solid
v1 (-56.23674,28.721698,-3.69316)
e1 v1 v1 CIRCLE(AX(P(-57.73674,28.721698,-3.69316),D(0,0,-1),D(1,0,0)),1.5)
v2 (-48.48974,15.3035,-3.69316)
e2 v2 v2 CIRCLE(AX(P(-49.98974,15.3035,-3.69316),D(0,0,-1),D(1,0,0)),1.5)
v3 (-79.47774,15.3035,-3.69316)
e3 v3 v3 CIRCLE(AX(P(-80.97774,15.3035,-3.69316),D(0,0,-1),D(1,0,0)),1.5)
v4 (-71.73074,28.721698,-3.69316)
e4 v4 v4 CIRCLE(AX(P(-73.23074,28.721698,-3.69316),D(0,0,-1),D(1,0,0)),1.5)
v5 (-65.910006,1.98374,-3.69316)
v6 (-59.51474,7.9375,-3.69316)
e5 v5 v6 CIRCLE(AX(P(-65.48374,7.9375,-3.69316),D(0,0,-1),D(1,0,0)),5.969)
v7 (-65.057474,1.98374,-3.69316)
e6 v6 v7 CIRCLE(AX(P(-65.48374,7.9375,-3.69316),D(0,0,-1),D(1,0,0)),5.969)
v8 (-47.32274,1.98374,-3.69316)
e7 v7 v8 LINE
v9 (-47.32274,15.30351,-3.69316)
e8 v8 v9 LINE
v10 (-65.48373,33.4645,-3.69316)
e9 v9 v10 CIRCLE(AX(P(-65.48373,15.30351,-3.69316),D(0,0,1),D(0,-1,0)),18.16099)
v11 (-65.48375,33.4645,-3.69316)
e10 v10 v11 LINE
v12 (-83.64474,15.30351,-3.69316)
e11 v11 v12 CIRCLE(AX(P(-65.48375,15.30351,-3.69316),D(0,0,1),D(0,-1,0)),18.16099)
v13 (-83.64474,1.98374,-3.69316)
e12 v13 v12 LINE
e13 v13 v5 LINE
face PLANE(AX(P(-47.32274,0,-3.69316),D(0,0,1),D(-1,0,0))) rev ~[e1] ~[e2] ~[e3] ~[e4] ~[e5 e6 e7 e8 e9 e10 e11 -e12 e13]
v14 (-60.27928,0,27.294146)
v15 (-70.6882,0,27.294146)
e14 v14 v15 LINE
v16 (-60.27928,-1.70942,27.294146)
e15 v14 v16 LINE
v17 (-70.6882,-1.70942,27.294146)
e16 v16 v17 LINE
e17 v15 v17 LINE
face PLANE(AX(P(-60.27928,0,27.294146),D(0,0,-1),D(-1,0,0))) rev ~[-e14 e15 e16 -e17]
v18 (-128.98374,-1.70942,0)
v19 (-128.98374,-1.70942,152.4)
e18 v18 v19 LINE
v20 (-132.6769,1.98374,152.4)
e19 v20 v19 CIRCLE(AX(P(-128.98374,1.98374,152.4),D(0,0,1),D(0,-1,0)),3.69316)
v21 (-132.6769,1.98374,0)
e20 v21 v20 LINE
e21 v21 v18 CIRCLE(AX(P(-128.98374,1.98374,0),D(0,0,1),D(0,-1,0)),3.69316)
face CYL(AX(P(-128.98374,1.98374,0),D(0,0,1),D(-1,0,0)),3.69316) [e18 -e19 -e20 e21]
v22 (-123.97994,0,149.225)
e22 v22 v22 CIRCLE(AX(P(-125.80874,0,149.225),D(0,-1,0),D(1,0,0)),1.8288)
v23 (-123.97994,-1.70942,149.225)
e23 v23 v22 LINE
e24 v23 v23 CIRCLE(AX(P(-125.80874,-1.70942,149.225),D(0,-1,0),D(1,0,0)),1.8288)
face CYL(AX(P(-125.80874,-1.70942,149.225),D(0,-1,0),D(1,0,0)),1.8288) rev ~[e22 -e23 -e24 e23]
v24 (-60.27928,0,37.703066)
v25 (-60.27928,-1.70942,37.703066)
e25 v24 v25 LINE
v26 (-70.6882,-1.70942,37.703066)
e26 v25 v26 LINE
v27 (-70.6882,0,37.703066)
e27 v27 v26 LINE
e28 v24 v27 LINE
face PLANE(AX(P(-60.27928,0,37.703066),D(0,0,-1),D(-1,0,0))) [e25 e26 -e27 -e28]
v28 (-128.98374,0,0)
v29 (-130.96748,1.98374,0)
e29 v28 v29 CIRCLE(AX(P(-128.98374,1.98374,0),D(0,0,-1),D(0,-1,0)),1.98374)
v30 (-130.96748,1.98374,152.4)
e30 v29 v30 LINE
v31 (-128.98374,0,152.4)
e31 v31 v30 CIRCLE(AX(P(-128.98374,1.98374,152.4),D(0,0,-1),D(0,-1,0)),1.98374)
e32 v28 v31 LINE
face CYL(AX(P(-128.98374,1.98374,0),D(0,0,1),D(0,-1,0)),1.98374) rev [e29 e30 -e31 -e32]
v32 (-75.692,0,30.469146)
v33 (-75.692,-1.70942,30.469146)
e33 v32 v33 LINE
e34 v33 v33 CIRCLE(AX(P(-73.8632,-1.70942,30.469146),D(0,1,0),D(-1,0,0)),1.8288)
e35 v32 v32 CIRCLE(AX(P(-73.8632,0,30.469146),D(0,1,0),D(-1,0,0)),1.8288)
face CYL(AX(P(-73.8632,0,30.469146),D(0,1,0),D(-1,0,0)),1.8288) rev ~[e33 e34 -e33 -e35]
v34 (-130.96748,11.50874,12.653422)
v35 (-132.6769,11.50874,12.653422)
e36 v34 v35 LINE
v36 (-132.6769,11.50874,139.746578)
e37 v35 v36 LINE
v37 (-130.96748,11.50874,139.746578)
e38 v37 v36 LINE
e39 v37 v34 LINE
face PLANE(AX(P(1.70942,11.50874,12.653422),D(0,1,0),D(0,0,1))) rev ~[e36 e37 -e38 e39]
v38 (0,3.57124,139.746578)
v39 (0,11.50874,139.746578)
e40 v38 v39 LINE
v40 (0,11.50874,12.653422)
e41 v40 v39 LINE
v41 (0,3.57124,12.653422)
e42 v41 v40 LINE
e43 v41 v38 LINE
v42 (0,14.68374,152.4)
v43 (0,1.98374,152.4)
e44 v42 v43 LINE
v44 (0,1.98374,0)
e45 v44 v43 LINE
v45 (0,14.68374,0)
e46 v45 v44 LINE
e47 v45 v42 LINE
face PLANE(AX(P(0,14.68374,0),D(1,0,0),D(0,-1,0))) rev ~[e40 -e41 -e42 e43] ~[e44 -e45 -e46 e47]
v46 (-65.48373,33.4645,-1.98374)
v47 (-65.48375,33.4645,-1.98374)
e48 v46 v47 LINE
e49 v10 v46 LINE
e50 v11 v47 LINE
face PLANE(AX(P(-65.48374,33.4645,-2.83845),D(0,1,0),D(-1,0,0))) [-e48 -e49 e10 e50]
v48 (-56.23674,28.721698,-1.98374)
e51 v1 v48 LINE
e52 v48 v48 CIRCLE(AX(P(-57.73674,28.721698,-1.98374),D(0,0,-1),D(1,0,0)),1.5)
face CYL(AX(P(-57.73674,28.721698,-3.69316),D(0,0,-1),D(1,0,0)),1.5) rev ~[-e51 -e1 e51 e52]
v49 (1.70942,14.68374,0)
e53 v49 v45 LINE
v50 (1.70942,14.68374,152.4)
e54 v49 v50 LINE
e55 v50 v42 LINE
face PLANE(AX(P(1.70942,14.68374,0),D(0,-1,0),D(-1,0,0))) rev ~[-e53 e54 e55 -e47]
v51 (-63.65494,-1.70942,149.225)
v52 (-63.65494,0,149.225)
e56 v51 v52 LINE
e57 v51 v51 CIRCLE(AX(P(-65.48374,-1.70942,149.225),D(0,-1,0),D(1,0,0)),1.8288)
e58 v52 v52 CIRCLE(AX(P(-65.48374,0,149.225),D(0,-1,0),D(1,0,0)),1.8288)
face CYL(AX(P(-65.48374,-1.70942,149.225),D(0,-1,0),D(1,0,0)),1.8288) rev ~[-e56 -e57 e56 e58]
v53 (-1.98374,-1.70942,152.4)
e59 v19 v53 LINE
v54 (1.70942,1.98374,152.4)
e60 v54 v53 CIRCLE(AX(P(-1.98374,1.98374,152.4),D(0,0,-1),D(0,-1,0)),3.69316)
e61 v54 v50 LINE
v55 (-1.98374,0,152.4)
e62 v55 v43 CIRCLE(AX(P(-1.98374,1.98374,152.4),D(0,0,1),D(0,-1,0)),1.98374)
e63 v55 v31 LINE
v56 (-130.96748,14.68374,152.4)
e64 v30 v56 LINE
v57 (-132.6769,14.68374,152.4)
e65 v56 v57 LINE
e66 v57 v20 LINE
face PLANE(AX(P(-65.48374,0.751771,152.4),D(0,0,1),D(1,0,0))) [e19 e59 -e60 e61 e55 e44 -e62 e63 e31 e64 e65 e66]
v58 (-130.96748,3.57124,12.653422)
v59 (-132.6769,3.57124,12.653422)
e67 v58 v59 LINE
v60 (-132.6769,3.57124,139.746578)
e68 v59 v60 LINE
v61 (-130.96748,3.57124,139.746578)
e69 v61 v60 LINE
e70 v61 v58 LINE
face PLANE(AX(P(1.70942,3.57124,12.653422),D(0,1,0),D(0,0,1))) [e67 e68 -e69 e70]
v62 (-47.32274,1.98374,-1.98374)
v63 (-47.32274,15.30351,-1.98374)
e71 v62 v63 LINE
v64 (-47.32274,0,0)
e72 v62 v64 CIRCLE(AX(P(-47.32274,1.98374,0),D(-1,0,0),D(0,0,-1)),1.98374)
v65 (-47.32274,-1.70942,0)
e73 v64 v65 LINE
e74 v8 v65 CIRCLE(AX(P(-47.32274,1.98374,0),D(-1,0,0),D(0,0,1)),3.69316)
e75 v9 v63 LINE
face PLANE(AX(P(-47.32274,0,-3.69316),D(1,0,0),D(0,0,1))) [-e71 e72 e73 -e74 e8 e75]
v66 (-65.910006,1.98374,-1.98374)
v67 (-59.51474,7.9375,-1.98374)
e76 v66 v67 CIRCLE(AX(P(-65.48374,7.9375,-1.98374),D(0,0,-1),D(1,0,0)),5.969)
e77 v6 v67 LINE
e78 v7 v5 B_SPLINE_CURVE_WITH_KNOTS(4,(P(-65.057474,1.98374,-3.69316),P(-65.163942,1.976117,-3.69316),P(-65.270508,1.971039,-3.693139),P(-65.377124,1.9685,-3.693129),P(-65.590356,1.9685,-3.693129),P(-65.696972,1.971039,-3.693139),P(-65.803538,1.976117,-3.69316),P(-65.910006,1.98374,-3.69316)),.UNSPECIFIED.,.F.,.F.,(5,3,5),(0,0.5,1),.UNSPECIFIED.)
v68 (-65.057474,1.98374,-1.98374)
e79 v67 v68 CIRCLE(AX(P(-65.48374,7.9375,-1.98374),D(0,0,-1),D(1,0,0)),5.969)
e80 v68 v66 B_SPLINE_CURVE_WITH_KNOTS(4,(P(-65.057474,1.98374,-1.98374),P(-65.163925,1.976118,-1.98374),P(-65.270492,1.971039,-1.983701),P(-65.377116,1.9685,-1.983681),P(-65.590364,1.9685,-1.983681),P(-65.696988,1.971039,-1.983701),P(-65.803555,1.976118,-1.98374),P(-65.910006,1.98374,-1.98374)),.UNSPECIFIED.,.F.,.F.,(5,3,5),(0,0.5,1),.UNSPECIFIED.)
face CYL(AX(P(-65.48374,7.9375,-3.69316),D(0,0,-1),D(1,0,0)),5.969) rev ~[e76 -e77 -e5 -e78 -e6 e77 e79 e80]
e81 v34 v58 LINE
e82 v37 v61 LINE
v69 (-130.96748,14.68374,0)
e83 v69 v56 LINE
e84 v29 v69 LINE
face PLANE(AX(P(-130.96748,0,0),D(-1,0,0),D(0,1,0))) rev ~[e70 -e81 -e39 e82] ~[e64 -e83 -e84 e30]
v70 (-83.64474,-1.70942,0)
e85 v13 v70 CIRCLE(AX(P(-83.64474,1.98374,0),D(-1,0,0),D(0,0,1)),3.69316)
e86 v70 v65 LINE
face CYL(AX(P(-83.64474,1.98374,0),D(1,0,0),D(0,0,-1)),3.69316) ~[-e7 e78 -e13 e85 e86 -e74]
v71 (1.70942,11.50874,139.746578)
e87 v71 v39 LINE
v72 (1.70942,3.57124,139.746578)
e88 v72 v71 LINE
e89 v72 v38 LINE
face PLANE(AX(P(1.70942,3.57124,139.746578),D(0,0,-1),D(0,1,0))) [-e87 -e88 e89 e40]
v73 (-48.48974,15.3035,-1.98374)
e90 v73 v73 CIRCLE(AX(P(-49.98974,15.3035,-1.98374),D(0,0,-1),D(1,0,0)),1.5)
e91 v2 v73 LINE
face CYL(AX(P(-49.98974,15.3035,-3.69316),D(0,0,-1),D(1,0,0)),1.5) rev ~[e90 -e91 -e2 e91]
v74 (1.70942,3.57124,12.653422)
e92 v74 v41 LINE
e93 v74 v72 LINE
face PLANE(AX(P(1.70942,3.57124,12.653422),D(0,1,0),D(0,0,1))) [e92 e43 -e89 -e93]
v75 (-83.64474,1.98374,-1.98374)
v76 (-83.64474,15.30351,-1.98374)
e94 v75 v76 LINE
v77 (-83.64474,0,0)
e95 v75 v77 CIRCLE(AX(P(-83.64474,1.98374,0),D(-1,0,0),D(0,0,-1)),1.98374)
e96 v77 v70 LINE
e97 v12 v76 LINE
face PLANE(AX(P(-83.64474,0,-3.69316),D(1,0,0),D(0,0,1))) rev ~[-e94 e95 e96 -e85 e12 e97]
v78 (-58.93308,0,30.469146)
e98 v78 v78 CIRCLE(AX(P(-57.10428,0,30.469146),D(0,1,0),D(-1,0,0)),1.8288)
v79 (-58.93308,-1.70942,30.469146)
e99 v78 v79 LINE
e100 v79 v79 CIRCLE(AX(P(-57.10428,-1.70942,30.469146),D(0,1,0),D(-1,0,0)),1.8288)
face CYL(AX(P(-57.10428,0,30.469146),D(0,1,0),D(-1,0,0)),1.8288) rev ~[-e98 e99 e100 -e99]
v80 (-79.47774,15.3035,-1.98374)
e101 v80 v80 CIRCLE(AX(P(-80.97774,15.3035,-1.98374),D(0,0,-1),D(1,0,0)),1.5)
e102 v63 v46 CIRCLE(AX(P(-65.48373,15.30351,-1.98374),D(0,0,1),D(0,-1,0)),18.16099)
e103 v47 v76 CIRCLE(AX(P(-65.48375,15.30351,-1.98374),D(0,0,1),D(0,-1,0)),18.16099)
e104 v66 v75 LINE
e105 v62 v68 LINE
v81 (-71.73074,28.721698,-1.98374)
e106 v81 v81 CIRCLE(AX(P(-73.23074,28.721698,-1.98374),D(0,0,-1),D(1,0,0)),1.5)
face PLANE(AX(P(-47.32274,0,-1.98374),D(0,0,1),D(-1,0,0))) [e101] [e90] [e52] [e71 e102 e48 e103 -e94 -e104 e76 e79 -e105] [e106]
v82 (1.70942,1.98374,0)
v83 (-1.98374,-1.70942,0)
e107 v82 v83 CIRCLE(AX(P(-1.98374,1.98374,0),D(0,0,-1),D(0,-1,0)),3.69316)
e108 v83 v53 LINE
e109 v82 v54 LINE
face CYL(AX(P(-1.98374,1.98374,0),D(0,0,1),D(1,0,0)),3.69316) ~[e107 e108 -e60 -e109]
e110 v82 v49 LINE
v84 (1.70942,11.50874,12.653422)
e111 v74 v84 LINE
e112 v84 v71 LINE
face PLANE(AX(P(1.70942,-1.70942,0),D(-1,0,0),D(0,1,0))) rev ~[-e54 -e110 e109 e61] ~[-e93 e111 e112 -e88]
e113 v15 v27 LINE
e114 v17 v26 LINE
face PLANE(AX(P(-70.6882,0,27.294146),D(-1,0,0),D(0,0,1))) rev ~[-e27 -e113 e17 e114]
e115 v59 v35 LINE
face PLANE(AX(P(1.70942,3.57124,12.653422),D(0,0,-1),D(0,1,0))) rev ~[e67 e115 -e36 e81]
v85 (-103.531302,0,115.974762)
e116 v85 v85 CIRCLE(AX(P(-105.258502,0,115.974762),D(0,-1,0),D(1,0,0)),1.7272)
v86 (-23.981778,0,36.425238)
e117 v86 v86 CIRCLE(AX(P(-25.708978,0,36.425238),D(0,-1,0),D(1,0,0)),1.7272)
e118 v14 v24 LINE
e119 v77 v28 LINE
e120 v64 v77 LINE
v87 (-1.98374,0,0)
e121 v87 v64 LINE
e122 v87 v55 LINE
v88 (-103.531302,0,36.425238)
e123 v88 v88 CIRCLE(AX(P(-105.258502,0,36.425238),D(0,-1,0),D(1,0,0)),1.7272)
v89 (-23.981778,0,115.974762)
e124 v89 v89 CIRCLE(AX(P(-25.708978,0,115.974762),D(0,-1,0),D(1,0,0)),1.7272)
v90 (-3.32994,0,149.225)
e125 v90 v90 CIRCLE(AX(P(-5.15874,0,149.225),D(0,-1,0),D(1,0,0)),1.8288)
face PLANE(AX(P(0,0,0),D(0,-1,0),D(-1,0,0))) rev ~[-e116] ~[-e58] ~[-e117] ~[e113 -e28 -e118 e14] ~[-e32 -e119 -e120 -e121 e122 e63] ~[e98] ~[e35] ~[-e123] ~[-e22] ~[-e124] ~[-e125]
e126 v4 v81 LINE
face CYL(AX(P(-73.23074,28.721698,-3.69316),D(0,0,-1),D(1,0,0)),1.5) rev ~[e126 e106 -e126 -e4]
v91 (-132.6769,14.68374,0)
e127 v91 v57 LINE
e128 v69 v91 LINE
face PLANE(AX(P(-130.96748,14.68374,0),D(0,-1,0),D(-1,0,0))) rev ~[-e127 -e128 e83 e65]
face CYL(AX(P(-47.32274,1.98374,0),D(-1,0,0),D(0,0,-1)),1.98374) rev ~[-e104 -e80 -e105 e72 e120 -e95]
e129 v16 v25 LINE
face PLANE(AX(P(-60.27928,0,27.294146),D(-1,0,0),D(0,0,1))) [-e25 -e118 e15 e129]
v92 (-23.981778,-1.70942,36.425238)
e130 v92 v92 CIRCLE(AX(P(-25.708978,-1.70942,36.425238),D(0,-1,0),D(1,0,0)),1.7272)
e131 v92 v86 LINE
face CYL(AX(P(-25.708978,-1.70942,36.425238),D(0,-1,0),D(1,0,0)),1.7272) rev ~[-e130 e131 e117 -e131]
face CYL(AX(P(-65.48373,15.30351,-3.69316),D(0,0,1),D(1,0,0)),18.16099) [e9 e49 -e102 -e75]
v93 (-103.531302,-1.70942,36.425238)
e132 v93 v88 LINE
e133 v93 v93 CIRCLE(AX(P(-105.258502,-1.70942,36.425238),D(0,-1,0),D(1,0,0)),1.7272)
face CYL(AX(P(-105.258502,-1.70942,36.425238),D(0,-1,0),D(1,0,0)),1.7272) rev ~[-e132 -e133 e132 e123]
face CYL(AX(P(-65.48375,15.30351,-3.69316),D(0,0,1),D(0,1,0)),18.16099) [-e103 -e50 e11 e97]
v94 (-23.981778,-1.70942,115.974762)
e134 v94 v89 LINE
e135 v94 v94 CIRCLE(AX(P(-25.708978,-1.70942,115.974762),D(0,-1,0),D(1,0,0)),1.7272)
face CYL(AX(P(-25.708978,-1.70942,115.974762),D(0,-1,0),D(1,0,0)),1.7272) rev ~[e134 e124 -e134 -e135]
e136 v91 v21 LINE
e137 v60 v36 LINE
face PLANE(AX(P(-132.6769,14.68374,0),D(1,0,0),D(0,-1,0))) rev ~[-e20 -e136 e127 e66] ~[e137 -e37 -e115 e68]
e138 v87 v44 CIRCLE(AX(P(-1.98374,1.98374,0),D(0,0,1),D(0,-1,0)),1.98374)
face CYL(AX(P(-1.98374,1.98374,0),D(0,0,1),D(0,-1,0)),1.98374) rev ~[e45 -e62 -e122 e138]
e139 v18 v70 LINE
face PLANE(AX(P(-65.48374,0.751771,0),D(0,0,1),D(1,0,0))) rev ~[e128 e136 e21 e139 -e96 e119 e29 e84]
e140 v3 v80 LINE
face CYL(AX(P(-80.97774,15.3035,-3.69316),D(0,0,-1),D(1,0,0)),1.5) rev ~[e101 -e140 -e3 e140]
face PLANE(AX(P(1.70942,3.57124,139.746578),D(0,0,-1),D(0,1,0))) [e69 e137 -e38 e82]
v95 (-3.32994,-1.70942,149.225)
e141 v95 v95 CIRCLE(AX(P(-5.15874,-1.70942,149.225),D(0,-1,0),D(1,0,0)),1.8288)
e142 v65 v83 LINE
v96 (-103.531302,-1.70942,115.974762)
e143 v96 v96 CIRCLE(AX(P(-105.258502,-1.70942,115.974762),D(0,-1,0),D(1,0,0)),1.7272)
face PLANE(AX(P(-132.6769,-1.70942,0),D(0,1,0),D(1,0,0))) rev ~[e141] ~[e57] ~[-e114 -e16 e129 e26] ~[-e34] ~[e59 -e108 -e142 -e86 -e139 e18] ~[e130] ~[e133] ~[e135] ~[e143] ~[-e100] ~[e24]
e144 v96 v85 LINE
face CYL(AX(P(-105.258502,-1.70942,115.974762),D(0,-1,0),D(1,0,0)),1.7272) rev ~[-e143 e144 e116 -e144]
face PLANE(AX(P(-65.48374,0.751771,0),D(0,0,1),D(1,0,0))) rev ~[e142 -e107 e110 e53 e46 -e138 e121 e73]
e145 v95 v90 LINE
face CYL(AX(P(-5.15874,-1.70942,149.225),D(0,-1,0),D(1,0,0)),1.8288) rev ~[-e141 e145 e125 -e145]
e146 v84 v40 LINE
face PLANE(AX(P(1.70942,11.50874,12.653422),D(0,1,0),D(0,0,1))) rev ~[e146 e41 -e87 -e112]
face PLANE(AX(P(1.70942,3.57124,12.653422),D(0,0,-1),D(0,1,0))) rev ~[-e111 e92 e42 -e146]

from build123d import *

# Parameters (mm, degrees)
F1_DEPTH  = 152.4
F2_W      = 7.9375
F2_H      = 127.0931567346
F3_DEPTH  = 134.38632
F4_W      = 36.322
F4_H      = 1.70942
F5_DEPTH  = 3.69316
F6_W      = 36.322
F6_H      = 1.70942
F7_DEPTH  = 33.4645
F8_R      = 3.69316
F9_R      = 1.98374
F10_R     = 5.969
F10_R_2   = 1.5
F11_DEPTH = 3.69316
F12_R     = 18.16099
F13_R     = 1.8288
F14_DEPTH = 1.70942
F15_R     = 1.7272
F16_DEPTH = 1.70942
F17_W     = 10.40892
F17_H     = 10.40892
F17_R     = 1.8288
F18_DEPTH = 1.70942


# Not quite as in the source:
# - a fillet or chamfer is up to 0.001 mm smaller than in the source, because OpenCascade refuses the exact size


with BuildPart() as f1:
    # F0 (on Top) → F1 (new body)
    with BuildSketch(Plane.XY):
        Polygon((0, 14.68374), (0, 0), (-130.96748, 0), (-130.96748, 14.68374), (-132.6769, 14.68374), (-132.6769, -1.70942), (1.70942, -1.70942), (1.70942, 14.68374), align=None)
    extrude(amount=F1_DEPTH)

    # F2 (on face) → F3 (cut, through all)
    with BuildSketch(Plane.YZ.offset(1.70942)):
        with Locations((7.53999, 76.2)):
            Rectangle(F2_W, F2_H)
    extrude(amount=-F3_DEPTH, mode=Mode.SUBTRACT)

    # F4 (on face) → F5 (join)
    with BuildSketch(Plane(origin=(0, 0, 0), x_dir=(1, 0, 0), z_dir=(0, 0, -1))):
        with Locations((-65.48374, 0.85471)):
            Rectangle(F4_W, F4_H)
    extrude(amount=F5_DEPTH)

    # F6 (on face) → F7 (join)
    with BuildSketch(Plane(origin=(0, 0, 0), x_dir=(-1, 0, 0), z_dir=(0, 1, 0))):
        with Locations((65.48374, -2.83845)):
            Rectangle(F6_W, F6_H)
    extrude(amount=F7_DEPTH)

    # F8
    f8_edges = [f1.edges().sort_by_distance(p)[0] for p in [
        (1.70942, -1.70942, 76.2),
        (-132.6769, -1.70942, 76.2),
        (-65.48374, -1.70942, -3.69316),
    ]]
    fillet(f8_edges, radius=F8_R)

    # F9
    f9_edges = [f1.edges().sort_by_distance(p)[0] for p in [
        (0, 0, 76.2),
        (-130.96748, 0, 76.2),
        (-65.48374, 0, -1.98374),
    ]]
    fillet(f9_edges, radius=F9_R)

    # F10 (on face) → F11 (cut, through all)
    with BuildSketch(Plane(origin=(0, 0, -3.69316), x_dir=(1, 0, 0), z_dir=(0, 0, -1))):
        with Locations((-65.48374, -7.9375)):
            Circle(F10_R)
        with Locations((-49.9897398917, -15.3035)):
            Circle(F10_R_2)
        with Locations((-80.9777401083, -15.3035)):
            Circle(F10_R_2)
        with Locations((-73.2307400541, -28.7216977)):
            Circle(F10_R_2)
        with Locations((-57.7367399459, -28.7216977)):
            Circle(F10_R_2)
    extrude(amount=-F11_DEPTH, mode=Mode.SUBTRACT)

    # F12 (radius 18.161 in the source; OpenCascade refuses exactly that, so slightly less here)
    f12_edges = [f1.edges().sort_by_distance(p)[0] for p in [
        (-47.32274, 33.4645, -2.83845),
        (-83.64474, 33.4645, -2.83845),
    ]]
    fillet(f12_edges, radius=F12_R)

    # F13 (on face) → F14 (cut, through all)
    with BuildSketch(Plane.XZ.offset(1.70942)):
        with Locations((-65.48374, 149.225)):
            Circle(F13_R)
        with Locations((-5.15874, 149.225)):
            Circle(F13_R)
        with Locations((-125.80874, 149.225)):
            Circle(F13_R)
    extrude(amount=-F14_DEPTH, mode=Mode.SUBTRACT)

    # F15 (on face) → F16 (cut, through all)
    with BuildSketch(Plane.XZ.offset(1.70942)):
        with Locations((-105.2585017, 115.9747617)):
            Circle(F15_R)
        with Locations((-25.7089783, 115.9747617)):
            Circle(F15_R)
        with Locations((-25.7089783, 36.4252383)):
            Circle(F15_R)
        with Locations((-105.2585017, 36.4252383)):
            Circle(F15_R)
    extrude(amount=-F16_DEPTH, mode=Mode.SUBTRACT)

    # F17 (on face) → F18 (cut, through all)
    with BuildSketch(Plane(origin=(0, 0, 0), x_dir=(-1, 0, 0), z_dir=(0, 1, 0))):
        with Locations((65.48374, 32.4986058015)):
            Rectangle(F17_W, F17_H)
        with Locations((73.8632, 30.4691458015)):
            Circle(F17_R)
        with Locations((57.10428, 30.4691458015)):
            Circle(F17_R)
    extrude(amount=-F18_DEPTH, mode=Mode.SUBTRACT)


solid = f1.part
